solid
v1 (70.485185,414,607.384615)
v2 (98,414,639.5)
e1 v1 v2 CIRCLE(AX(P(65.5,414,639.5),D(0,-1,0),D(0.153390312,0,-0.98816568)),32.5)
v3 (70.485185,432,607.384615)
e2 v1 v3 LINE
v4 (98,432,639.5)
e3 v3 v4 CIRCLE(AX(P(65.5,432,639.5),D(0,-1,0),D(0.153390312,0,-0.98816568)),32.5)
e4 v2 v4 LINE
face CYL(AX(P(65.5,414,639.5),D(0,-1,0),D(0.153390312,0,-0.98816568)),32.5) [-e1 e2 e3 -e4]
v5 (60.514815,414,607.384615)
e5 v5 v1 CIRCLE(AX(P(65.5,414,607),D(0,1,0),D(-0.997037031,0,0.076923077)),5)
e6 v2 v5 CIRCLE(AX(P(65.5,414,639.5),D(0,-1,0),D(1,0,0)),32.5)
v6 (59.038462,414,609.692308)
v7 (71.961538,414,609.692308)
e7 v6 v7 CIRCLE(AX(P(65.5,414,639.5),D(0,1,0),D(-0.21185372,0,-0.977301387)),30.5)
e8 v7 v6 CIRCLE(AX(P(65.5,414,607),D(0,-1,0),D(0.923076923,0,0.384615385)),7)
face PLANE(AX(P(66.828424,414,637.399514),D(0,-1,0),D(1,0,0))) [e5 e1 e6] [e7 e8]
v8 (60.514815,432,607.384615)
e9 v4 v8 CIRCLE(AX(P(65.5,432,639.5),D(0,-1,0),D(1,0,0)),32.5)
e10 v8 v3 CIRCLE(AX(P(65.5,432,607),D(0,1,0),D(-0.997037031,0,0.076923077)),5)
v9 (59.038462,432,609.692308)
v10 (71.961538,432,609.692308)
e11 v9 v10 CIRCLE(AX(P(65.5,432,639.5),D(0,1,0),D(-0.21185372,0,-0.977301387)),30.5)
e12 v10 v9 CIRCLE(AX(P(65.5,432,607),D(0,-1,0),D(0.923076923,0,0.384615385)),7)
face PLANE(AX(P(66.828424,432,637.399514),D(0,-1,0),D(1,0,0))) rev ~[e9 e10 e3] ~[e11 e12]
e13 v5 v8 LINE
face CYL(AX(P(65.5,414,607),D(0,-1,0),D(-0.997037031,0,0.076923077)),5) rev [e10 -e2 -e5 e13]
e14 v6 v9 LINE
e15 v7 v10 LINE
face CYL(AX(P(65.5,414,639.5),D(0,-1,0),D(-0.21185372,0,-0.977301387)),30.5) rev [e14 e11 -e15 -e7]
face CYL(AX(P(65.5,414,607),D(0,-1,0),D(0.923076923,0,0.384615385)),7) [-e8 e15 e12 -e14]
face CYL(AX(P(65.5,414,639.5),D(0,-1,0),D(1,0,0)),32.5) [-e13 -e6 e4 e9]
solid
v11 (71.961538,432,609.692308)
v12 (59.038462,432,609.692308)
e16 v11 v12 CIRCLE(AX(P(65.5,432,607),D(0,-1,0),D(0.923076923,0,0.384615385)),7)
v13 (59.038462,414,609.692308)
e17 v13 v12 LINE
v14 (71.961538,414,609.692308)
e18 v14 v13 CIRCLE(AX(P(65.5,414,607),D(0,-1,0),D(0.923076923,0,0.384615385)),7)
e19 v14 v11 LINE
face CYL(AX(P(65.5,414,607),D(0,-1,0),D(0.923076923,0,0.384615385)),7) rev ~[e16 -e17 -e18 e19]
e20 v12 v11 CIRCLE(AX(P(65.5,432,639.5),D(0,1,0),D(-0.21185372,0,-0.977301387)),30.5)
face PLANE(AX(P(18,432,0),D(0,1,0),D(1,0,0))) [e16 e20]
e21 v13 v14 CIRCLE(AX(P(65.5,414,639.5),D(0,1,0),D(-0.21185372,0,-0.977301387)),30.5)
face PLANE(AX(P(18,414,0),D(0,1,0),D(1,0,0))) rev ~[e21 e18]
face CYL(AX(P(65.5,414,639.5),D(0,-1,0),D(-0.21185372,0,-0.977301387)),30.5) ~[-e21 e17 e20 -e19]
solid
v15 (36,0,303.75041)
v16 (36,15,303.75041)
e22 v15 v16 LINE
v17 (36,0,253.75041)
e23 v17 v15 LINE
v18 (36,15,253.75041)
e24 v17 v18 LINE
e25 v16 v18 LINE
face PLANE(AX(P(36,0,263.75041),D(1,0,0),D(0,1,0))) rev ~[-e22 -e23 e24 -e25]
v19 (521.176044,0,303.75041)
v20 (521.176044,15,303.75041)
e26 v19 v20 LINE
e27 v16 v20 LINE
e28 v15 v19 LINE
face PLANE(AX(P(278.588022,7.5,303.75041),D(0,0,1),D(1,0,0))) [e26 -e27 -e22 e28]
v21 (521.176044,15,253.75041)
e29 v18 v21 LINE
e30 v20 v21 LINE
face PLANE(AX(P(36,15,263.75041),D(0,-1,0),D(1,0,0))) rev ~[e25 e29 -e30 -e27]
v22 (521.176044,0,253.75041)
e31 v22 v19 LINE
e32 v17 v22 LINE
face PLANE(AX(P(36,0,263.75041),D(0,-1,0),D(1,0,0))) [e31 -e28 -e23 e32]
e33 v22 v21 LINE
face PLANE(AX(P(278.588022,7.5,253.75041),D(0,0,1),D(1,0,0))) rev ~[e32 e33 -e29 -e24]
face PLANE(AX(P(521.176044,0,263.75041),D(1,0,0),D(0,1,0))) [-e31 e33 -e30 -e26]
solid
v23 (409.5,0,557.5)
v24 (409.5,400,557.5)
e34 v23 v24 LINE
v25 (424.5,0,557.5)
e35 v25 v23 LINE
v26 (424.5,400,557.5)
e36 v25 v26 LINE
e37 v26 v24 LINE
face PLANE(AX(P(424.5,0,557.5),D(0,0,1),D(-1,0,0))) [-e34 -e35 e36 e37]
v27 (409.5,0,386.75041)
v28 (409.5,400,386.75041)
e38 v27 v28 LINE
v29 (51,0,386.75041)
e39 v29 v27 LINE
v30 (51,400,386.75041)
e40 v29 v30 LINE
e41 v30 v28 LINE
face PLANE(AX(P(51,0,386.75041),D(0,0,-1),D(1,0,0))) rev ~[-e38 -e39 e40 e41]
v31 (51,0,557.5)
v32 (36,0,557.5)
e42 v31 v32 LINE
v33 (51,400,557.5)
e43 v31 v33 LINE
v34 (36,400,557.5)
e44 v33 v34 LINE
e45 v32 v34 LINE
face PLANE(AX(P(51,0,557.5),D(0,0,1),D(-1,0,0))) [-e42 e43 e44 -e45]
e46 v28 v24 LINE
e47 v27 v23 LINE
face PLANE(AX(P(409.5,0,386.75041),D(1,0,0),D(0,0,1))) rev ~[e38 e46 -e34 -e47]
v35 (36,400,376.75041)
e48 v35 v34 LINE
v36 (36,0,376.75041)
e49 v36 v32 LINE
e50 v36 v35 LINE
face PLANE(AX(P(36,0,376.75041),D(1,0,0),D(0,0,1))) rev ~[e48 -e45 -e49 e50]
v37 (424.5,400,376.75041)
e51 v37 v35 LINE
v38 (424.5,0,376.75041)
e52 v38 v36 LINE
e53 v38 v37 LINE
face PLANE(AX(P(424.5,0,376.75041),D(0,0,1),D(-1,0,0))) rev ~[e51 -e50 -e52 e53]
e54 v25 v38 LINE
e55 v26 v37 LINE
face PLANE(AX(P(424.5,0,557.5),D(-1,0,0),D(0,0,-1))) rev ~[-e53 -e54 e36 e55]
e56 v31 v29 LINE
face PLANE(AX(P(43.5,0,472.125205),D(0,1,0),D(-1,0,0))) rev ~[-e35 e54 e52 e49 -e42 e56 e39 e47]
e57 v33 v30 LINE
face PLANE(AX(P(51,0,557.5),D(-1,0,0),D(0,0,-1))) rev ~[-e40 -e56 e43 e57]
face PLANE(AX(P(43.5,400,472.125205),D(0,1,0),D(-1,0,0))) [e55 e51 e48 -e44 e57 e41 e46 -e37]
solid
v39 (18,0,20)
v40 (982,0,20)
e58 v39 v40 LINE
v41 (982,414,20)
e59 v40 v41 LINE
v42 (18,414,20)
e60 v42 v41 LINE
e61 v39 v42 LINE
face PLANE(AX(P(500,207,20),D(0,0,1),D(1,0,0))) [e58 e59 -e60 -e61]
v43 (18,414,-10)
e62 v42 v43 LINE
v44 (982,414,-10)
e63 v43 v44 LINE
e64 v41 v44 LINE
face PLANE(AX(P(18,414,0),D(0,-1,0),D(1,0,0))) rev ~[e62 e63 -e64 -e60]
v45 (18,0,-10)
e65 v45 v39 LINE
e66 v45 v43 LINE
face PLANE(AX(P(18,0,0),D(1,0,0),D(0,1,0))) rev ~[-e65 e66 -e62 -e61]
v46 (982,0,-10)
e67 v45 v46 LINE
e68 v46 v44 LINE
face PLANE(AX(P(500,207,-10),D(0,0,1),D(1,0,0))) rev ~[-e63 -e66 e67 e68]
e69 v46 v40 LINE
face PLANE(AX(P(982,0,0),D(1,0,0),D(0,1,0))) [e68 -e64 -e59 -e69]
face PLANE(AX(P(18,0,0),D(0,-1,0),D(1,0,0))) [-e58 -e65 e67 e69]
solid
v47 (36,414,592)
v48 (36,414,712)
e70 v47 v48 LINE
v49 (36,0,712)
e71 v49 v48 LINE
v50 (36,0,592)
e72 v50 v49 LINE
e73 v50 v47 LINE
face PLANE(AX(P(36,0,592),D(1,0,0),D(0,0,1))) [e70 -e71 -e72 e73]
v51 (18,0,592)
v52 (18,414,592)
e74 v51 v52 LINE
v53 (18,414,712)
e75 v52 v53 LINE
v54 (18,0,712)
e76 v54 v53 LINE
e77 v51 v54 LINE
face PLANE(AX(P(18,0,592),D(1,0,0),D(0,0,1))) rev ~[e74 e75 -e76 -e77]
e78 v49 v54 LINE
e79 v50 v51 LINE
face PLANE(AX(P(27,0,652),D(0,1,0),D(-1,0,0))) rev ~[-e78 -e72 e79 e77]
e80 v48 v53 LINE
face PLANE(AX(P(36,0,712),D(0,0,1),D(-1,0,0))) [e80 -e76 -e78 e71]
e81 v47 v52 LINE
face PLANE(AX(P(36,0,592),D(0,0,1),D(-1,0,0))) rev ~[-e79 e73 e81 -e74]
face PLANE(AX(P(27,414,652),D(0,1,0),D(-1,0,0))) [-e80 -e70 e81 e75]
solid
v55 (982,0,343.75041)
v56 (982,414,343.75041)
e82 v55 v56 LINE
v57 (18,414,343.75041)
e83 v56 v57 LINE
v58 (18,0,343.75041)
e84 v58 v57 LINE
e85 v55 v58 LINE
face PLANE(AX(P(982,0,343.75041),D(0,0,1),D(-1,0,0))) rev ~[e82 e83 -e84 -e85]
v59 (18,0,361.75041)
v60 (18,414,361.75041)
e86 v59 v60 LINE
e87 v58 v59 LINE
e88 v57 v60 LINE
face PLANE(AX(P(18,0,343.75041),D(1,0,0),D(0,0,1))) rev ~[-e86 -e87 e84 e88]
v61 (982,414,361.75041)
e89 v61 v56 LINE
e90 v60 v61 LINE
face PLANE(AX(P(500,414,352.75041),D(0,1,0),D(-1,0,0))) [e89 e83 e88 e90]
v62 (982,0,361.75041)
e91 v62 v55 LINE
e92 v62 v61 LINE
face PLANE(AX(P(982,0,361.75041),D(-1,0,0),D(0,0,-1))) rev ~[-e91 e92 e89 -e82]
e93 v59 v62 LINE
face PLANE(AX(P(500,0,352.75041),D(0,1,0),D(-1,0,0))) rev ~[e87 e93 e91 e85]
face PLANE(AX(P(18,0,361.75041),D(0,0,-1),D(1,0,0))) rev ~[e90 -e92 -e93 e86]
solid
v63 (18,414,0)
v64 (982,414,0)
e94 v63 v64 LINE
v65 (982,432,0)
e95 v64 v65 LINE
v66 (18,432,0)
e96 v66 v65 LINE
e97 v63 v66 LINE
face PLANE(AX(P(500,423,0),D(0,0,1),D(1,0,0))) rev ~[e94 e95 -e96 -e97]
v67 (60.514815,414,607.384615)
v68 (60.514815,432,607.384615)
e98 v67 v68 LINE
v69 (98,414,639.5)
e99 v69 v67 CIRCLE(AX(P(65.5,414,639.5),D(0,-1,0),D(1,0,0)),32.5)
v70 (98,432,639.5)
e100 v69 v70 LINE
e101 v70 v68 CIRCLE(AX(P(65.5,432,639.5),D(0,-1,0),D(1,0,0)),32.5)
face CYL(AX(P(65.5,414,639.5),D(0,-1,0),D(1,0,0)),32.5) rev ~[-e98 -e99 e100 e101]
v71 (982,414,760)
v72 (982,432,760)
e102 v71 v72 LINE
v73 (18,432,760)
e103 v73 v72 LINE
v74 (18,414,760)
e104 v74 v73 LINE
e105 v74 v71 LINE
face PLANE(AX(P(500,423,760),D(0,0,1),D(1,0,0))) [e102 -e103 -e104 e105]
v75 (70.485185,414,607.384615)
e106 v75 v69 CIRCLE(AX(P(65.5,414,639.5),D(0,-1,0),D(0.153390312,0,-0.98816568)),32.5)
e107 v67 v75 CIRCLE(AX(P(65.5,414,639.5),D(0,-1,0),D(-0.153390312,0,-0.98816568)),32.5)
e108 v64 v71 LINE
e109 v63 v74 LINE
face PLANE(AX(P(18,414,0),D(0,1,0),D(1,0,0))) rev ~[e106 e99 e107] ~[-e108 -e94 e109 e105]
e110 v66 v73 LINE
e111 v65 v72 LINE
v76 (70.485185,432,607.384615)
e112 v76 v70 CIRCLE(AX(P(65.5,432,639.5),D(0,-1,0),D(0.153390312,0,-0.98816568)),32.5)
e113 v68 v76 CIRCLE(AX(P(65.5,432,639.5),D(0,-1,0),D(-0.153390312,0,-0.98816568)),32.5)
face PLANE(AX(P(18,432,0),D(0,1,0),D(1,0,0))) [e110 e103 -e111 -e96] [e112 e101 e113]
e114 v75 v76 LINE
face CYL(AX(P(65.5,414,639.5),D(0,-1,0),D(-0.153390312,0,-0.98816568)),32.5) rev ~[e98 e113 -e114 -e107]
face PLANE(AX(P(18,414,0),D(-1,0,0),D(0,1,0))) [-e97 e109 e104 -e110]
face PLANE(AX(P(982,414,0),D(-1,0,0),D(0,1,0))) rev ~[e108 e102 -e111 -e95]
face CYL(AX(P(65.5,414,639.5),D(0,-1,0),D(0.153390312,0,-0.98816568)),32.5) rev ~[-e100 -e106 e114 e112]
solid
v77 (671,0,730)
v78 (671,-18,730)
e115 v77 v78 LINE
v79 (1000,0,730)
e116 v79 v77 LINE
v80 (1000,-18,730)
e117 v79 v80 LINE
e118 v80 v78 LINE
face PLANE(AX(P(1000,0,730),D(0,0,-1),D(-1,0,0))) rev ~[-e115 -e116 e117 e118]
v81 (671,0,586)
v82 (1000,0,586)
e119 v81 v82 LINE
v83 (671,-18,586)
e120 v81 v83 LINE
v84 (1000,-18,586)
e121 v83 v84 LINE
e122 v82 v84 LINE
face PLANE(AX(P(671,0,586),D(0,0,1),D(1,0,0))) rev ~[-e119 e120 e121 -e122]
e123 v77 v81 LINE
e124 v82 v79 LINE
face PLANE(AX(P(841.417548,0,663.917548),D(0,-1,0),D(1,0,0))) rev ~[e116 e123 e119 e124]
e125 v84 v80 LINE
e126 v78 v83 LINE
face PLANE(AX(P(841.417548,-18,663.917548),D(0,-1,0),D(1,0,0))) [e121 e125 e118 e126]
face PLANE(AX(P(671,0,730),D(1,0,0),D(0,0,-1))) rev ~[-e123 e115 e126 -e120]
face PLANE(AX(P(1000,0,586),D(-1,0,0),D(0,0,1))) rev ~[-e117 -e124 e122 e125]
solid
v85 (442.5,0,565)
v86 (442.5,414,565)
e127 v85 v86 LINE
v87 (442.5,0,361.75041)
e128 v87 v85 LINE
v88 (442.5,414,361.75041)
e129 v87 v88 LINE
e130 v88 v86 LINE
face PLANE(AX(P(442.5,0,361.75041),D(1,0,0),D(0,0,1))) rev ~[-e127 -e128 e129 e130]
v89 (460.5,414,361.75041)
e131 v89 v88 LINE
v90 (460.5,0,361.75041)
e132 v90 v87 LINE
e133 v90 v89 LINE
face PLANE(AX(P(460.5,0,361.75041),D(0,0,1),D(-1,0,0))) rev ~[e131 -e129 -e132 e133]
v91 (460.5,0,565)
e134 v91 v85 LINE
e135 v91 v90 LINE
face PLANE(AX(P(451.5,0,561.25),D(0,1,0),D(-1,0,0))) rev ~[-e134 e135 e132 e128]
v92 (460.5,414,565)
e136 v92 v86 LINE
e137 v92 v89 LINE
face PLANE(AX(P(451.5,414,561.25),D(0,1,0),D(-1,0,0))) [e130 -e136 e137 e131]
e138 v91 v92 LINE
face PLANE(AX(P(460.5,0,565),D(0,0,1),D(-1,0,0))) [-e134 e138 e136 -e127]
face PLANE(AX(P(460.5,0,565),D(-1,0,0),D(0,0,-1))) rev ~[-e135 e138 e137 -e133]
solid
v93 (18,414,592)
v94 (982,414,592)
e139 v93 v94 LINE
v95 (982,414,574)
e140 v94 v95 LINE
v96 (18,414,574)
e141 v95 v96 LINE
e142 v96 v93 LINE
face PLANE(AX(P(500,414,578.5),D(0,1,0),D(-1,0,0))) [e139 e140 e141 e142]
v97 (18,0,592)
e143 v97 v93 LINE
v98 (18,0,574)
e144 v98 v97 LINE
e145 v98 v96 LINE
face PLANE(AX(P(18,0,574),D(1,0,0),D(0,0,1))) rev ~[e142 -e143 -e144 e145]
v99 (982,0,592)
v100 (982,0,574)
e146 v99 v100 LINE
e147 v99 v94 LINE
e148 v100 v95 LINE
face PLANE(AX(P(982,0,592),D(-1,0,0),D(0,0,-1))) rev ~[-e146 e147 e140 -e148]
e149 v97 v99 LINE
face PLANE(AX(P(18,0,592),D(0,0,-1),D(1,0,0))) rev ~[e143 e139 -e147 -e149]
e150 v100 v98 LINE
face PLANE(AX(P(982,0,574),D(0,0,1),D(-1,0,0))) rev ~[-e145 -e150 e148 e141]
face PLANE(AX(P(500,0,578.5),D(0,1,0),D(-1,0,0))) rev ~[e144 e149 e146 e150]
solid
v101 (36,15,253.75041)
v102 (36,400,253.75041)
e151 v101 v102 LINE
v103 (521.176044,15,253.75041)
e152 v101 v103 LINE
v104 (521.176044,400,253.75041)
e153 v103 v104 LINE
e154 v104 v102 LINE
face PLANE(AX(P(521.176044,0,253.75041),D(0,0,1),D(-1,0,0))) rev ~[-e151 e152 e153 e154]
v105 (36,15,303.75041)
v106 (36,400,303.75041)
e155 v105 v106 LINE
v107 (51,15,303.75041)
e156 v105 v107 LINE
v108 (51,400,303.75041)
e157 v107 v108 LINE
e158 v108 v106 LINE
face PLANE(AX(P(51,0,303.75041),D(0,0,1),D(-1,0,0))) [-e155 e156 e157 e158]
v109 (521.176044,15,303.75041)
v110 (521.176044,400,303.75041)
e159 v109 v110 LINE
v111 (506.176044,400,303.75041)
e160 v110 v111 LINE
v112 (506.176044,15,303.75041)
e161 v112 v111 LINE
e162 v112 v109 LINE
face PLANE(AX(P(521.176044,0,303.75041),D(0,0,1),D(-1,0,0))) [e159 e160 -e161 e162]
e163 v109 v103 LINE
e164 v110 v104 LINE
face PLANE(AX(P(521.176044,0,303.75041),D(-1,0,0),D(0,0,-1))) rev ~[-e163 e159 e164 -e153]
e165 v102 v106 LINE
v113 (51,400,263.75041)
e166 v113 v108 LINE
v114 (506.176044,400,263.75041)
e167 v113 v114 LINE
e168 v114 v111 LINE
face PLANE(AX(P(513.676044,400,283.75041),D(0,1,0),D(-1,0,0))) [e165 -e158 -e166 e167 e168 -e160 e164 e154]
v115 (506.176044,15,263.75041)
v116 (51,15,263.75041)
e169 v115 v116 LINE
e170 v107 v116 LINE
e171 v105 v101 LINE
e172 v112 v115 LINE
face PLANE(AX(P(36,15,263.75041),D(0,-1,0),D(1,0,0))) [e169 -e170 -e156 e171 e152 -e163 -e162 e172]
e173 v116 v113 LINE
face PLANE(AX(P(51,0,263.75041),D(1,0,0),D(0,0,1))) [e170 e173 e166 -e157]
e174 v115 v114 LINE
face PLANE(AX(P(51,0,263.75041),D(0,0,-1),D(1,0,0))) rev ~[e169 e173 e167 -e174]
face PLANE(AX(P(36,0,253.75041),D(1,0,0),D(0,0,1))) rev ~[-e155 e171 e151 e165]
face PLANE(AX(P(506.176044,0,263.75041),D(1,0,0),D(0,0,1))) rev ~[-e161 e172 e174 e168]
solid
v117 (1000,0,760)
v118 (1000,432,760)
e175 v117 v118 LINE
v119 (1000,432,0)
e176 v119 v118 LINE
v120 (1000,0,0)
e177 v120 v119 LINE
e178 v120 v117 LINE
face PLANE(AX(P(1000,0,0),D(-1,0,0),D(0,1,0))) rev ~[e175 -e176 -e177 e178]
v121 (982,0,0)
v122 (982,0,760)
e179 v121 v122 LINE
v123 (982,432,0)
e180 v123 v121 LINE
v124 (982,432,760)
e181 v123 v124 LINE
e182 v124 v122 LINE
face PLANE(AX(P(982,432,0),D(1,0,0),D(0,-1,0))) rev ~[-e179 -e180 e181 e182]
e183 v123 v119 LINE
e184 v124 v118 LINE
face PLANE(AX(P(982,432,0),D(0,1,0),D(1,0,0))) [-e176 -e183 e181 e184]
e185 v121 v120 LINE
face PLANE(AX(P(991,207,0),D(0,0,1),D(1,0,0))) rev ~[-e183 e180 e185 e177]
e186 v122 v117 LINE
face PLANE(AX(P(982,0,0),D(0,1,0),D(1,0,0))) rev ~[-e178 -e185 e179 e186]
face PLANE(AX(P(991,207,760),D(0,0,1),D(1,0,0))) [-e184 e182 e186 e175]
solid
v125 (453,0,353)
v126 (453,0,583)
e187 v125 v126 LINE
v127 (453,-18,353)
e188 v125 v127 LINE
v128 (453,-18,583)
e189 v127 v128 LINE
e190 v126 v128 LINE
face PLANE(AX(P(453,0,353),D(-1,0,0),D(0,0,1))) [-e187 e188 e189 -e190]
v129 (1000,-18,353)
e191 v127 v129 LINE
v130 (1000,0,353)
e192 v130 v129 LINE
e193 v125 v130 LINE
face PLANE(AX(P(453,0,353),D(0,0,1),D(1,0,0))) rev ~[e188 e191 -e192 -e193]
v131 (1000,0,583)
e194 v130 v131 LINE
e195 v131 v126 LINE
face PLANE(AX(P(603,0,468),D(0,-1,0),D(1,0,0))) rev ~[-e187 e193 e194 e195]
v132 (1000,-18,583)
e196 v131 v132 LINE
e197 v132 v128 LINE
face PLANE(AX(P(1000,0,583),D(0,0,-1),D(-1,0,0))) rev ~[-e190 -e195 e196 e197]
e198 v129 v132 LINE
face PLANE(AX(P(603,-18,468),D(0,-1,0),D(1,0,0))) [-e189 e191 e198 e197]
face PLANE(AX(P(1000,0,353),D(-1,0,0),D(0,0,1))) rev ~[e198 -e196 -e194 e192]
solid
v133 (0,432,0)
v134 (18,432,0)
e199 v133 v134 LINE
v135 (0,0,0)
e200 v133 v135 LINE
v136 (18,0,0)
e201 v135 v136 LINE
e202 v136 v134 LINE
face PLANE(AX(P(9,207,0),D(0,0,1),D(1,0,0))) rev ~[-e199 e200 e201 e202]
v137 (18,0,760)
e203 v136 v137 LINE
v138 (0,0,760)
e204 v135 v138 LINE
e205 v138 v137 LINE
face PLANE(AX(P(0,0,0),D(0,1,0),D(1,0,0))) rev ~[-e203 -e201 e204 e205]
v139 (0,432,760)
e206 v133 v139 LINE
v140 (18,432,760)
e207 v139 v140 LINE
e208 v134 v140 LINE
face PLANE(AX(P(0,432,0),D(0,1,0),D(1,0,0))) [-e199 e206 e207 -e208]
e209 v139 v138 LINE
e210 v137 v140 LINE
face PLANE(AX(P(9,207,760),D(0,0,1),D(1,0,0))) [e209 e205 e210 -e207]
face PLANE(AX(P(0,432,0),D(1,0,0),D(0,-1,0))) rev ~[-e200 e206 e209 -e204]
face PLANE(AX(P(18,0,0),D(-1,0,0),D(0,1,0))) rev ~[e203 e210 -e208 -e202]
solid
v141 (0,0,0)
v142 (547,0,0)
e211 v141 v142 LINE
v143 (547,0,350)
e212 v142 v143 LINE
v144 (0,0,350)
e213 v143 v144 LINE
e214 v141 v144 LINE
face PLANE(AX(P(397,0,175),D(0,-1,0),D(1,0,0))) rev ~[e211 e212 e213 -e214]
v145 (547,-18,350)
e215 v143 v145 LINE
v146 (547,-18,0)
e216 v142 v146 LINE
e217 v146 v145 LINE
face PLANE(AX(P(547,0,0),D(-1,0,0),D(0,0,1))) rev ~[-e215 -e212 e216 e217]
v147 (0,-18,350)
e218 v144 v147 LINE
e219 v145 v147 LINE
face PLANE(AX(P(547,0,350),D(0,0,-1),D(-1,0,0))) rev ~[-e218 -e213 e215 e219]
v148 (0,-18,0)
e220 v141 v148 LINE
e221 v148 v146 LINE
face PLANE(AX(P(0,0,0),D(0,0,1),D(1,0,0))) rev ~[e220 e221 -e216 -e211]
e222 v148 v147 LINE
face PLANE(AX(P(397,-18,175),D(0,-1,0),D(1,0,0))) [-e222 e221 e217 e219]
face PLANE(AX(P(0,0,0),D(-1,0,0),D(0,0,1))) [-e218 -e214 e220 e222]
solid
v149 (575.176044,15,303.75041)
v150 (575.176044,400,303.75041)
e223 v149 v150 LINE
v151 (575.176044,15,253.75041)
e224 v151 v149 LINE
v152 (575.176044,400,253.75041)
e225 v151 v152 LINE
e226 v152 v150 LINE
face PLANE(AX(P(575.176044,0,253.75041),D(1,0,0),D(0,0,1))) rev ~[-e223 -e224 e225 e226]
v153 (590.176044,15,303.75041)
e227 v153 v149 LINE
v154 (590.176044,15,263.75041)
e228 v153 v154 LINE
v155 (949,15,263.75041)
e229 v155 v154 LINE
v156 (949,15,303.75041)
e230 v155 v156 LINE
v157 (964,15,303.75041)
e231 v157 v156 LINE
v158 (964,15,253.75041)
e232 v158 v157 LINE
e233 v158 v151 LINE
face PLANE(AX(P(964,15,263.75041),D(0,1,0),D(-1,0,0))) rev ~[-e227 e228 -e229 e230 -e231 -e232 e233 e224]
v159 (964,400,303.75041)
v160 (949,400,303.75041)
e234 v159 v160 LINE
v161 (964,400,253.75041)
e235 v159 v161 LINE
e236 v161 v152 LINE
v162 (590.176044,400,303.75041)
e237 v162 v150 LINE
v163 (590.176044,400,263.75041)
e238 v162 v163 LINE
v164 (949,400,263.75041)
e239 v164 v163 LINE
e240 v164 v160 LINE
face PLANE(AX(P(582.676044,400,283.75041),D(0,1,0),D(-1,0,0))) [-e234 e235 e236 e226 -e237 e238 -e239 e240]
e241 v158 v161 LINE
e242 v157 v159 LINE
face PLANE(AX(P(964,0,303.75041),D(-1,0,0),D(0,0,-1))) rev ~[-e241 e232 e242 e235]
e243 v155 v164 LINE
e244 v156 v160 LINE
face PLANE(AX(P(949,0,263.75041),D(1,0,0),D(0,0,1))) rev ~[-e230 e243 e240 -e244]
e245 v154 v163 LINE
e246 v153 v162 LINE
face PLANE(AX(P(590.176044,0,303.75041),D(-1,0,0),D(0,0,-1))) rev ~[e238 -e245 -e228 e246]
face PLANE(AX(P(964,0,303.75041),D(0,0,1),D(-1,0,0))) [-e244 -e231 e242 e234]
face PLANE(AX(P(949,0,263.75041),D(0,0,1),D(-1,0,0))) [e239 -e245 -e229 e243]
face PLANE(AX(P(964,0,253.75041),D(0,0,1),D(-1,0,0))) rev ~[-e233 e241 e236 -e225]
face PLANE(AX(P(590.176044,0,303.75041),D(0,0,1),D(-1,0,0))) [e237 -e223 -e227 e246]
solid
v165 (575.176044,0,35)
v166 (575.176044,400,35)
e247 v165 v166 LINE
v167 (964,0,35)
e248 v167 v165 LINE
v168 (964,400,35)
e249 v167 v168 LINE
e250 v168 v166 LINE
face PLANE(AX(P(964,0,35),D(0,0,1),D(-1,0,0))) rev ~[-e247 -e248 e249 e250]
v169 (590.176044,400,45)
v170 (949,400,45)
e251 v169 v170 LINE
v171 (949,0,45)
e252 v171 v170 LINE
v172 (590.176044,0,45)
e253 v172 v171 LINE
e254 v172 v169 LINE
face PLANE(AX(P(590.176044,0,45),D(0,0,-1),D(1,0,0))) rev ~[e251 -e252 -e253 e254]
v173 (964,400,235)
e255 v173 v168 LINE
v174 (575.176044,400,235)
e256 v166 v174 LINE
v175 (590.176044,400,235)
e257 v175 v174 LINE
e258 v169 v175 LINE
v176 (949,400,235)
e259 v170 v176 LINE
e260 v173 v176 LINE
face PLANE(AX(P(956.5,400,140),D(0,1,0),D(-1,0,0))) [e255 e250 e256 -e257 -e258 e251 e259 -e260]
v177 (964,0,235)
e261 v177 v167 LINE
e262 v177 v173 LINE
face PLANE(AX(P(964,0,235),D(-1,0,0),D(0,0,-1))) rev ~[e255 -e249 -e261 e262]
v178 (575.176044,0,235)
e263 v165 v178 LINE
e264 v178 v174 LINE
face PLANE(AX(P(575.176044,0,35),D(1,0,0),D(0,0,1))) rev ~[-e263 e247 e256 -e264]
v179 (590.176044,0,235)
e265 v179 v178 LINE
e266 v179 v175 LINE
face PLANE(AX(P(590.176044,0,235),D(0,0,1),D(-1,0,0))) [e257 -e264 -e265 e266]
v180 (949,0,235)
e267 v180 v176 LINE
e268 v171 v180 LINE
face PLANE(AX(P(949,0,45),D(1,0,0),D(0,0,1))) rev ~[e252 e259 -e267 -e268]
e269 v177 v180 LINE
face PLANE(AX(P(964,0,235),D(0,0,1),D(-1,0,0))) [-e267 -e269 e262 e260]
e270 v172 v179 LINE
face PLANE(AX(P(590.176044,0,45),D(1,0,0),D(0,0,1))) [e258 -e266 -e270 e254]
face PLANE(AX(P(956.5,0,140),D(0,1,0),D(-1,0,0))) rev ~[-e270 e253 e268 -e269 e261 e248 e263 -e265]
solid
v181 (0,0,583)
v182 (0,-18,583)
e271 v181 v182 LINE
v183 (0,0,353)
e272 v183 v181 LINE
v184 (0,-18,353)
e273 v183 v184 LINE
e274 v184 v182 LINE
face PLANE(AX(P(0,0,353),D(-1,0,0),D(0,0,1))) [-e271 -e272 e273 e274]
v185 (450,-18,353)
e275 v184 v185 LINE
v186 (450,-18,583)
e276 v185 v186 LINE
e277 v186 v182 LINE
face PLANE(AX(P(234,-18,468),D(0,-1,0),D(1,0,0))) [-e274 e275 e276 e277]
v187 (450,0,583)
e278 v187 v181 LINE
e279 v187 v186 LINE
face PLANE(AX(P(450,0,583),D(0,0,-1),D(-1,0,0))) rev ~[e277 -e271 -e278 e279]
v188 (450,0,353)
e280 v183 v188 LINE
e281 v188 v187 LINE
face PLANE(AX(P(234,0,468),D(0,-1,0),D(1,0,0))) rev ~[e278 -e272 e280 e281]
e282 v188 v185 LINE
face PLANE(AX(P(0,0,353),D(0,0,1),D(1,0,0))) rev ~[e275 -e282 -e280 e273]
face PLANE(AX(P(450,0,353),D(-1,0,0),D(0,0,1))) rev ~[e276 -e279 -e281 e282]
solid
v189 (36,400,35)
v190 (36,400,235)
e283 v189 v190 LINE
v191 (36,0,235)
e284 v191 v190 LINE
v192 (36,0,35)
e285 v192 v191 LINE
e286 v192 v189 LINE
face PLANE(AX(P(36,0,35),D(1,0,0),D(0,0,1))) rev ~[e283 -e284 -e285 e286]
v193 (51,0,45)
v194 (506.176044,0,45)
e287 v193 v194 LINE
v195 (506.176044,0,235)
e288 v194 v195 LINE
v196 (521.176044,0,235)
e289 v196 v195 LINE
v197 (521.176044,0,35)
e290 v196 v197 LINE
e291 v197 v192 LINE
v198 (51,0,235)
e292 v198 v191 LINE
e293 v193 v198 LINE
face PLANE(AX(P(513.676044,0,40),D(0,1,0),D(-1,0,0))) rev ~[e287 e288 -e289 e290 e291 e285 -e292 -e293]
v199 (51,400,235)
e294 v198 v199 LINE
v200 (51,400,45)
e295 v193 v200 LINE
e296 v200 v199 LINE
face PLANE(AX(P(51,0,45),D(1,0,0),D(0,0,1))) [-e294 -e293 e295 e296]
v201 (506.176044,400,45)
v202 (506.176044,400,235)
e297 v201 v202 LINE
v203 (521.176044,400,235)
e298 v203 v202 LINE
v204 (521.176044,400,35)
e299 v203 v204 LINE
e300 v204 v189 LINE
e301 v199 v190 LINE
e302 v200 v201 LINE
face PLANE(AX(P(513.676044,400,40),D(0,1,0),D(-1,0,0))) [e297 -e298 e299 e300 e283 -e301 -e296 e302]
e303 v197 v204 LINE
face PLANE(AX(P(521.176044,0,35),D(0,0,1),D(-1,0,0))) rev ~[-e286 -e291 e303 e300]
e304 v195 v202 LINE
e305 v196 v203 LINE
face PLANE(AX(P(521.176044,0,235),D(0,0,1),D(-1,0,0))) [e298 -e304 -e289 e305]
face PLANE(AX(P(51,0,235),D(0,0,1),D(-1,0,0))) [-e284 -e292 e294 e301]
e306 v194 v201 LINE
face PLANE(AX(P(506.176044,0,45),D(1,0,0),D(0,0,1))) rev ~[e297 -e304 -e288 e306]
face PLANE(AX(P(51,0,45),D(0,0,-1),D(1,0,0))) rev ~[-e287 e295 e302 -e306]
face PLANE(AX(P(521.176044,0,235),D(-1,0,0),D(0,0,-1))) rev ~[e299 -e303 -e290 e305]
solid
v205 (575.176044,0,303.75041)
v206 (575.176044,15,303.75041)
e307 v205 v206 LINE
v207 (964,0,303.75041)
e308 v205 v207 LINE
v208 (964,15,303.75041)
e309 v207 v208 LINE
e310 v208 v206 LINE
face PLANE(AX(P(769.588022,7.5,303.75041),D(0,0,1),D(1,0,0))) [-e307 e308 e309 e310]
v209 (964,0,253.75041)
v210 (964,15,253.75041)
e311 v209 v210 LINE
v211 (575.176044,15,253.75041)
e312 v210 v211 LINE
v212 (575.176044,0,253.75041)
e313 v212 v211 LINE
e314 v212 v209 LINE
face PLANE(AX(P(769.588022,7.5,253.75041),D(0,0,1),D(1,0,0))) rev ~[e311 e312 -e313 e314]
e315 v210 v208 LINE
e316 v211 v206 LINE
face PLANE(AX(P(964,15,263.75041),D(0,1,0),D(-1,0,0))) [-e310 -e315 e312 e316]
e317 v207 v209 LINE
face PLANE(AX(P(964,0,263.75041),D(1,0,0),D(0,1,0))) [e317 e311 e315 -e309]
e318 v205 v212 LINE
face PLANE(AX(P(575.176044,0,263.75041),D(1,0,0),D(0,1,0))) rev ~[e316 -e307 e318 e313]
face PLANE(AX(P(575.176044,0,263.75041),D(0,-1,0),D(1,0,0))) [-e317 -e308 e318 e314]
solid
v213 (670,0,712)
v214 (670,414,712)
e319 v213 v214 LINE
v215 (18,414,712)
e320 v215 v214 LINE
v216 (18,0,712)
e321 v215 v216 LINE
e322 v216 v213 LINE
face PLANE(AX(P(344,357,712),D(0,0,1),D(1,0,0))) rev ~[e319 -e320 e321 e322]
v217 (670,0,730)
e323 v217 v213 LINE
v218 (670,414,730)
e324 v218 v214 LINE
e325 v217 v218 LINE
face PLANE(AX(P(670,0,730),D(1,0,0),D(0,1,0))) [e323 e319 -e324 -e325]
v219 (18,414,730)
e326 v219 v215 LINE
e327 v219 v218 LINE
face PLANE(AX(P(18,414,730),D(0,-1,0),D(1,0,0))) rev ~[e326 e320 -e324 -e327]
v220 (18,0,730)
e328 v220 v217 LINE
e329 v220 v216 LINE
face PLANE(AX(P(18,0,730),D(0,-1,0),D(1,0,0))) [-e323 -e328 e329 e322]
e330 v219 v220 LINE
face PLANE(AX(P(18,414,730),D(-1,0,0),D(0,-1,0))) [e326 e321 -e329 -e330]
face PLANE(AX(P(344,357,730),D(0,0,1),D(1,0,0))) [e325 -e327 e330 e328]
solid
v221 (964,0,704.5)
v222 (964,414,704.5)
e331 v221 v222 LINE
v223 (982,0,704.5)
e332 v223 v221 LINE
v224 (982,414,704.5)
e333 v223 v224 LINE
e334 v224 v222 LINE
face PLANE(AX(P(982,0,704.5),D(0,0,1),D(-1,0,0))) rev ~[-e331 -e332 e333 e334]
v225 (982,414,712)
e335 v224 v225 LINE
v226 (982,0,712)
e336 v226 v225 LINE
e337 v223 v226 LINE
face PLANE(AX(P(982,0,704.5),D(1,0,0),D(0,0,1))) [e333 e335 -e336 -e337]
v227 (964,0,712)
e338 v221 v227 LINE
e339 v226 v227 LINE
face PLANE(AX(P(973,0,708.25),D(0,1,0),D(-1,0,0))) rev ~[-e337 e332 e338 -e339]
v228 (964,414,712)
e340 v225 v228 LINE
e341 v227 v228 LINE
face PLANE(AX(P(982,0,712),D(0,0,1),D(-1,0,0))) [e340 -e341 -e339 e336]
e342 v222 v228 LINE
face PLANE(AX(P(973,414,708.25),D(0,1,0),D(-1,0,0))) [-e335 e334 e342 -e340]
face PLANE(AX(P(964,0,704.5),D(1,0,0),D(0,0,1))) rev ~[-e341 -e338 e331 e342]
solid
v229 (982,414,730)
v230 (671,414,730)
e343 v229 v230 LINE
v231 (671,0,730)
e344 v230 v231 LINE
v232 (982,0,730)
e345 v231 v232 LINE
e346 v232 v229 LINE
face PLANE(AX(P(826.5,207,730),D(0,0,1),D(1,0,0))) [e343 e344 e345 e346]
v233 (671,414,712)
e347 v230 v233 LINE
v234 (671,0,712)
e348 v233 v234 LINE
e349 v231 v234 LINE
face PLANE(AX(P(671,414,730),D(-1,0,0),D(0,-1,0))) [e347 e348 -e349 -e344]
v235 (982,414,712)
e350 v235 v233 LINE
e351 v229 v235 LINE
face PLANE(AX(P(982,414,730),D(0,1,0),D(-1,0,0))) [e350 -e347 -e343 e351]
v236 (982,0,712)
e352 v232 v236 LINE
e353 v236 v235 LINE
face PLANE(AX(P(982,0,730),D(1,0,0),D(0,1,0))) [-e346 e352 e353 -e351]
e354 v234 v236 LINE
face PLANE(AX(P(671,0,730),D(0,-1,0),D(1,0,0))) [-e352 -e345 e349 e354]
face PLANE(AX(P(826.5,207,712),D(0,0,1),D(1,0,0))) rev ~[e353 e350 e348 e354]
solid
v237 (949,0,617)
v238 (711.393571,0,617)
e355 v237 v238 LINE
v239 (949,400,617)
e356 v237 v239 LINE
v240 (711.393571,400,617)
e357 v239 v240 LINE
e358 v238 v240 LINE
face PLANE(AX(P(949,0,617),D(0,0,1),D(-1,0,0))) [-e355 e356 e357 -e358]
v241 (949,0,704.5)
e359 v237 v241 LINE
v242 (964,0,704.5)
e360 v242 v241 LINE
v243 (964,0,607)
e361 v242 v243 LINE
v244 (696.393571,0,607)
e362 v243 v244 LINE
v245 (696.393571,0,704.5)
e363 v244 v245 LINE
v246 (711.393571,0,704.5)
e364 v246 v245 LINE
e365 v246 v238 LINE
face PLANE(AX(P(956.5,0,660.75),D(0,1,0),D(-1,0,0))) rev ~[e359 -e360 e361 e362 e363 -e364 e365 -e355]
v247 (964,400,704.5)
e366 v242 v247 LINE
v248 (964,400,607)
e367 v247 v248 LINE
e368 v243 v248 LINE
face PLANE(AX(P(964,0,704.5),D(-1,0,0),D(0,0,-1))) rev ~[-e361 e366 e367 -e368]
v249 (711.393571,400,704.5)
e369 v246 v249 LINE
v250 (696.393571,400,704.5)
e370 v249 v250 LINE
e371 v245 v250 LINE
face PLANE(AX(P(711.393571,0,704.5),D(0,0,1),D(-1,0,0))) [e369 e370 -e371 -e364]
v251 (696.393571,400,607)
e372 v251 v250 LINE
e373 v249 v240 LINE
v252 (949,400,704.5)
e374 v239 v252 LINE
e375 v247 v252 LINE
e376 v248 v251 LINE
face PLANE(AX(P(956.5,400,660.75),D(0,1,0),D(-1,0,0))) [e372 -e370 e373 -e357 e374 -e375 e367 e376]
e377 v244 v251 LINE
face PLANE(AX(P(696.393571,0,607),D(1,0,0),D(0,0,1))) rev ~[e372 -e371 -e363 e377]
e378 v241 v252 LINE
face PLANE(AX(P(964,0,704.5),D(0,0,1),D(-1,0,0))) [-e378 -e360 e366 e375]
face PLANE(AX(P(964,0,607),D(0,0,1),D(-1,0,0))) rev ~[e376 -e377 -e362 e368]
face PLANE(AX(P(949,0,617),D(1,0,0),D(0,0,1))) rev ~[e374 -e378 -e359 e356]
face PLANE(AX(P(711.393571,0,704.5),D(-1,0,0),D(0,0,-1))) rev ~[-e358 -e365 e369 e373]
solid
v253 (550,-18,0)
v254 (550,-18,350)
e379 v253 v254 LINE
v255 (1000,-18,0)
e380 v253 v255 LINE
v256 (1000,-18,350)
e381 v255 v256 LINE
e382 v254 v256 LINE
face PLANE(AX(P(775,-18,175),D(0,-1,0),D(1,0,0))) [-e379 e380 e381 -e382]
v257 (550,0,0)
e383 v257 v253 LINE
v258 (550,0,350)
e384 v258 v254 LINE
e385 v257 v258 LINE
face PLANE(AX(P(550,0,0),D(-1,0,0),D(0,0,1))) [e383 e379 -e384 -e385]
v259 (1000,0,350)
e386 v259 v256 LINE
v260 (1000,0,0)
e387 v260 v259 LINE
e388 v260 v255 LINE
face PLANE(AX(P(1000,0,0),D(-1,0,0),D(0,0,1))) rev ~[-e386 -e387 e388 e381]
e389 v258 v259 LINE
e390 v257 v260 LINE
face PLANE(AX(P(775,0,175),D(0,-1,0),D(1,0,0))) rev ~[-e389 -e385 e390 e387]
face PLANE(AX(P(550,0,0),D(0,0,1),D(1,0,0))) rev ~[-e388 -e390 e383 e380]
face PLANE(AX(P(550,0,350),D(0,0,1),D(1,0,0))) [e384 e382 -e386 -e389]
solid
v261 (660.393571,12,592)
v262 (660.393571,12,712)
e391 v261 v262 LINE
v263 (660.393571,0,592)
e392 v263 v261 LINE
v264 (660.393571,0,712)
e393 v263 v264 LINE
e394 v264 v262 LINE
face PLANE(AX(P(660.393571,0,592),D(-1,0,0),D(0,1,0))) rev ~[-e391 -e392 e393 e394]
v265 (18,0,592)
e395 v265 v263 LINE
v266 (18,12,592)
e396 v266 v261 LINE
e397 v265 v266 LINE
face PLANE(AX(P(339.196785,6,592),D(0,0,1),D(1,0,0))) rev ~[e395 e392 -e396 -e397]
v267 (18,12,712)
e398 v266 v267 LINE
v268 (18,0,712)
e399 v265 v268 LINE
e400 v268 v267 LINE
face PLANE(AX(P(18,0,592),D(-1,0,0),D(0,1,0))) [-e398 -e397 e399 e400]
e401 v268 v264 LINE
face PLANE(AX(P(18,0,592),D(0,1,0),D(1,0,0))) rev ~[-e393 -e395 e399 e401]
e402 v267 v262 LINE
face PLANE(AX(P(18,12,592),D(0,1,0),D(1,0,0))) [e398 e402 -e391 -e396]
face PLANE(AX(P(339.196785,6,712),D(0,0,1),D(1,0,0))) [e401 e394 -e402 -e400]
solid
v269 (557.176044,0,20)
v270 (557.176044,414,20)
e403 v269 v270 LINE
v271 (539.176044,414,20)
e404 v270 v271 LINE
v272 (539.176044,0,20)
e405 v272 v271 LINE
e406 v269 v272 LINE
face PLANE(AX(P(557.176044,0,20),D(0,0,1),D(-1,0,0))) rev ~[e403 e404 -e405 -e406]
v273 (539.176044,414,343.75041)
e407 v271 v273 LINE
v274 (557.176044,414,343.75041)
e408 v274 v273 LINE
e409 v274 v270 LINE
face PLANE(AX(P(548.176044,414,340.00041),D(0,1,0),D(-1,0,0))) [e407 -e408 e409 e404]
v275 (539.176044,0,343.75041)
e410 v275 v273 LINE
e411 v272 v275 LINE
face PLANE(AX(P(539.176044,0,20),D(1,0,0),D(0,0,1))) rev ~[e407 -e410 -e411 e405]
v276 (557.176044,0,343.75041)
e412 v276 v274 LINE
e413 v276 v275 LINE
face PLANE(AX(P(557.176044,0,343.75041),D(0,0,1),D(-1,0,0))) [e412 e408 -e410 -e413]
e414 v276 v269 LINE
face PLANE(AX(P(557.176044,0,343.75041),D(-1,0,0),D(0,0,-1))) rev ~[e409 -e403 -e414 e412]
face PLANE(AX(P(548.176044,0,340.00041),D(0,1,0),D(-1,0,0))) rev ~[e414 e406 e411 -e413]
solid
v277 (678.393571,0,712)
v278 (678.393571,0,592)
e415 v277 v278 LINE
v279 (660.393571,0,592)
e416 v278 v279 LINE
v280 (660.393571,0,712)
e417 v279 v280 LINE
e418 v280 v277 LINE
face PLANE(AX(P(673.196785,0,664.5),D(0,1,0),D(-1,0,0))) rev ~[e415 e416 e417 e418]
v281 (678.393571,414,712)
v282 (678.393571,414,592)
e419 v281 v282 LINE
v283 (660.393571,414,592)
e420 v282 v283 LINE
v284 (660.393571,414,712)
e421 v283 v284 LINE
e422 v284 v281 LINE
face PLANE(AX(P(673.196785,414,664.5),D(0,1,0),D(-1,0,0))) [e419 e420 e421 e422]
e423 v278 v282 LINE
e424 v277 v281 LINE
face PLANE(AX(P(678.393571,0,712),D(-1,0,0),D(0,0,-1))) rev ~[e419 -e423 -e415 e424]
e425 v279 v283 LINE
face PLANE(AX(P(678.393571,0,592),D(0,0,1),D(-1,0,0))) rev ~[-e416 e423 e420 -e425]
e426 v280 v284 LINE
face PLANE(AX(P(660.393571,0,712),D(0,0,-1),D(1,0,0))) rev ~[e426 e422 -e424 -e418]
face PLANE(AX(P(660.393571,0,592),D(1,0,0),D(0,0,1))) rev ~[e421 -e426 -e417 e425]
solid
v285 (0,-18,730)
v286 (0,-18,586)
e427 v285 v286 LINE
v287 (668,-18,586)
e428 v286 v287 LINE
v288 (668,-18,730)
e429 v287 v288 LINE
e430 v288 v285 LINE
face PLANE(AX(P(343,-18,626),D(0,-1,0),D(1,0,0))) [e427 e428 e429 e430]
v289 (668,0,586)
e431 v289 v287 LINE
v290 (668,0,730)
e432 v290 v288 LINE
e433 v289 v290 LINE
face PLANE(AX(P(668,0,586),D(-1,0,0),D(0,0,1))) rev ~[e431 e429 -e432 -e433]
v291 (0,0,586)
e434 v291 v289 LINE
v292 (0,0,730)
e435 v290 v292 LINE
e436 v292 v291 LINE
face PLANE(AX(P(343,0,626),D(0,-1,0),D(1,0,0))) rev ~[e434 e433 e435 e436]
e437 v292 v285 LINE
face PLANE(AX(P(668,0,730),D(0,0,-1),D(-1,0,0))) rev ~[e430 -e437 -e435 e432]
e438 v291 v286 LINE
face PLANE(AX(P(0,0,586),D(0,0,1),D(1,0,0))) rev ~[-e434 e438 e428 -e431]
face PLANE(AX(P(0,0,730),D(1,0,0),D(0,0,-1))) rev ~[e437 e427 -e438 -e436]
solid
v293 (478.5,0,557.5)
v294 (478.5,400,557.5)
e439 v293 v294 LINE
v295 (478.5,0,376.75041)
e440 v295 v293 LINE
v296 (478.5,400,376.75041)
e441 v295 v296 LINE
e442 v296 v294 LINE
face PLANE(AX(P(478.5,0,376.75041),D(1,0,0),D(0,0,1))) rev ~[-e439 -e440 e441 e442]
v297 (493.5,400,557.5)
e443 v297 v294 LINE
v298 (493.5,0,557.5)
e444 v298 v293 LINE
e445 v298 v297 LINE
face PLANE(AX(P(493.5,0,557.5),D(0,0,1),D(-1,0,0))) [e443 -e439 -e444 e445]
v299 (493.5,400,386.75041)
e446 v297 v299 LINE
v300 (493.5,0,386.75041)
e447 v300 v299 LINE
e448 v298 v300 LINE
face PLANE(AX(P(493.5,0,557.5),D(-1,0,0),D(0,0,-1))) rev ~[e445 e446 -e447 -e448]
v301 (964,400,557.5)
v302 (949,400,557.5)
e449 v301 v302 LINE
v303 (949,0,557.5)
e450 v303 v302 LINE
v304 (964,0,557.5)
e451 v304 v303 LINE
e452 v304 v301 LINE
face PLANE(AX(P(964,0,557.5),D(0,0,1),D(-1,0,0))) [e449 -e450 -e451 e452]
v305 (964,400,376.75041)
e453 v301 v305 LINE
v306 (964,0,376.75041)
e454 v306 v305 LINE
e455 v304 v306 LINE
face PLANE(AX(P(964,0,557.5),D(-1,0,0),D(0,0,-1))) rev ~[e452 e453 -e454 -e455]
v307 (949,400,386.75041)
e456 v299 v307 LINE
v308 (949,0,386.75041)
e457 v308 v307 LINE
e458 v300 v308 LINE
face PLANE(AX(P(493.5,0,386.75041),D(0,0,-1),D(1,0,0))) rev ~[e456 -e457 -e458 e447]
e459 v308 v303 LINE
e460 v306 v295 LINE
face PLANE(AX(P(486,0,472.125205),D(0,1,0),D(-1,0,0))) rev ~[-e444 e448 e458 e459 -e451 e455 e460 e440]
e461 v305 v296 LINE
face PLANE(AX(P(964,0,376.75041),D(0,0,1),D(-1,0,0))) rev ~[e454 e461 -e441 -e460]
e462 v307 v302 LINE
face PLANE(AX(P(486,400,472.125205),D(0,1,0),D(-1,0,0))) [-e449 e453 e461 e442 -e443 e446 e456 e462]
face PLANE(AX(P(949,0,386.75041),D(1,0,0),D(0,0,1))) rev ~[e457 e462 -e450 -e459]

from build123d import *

# Parameters (mm, degrees)
F0_W           = 18
F0_H           = 414
F0_H_2         = 18
F1_DEPTH       = 760
F0_W_2         = 964
F2_DEPTH       = 760
F3_DEPTH       = 20
F3_DEPTH_BACK  = 10
F5_DEPTH       = 18
F4_W           = 652
F4_H           = 114
F4_H_2         = 300
F7_W           = 432
F7_H           = 230
F7_W_2         = 18
F8_DEPTH       = 18
F7_W_3         = 300
F7_W_4         = 244
F7_W_5         = 3
F7_W_6         = 450
F7_H_2         = 350
F7_W_7         = 226
F7_W_8         = 650
F7_H_3         = 80
F7_H_4         = 46
F7_H_5         = 18
F7_W_9         = 311
F10_DEPTH      = 414
F9_W           = 18
F9_H           = 9
F9_W_2         = 624.3935708242
F9_H_2         = 6
F9_H_3         = 3
F9_W_3         = 7.6064291758
F9_W_4         = 237.6064291758
F9_W_5         = 15
F9_W_6         = 10.3935708242
F9_H_4         = 15
F9_H_5         = 10
F11_DEPTH      = 414
F9_H_6         = 7.5
F9_H_7         = 170.74959
F9_H_8         = 291.25041
F9_H_9         = 120
F9_W_7         = 358.5
F12_DEPTH      = 400
F9_W_8         = 455.5
F9_H_10        = 190
F9_W_9         = 358.8239558978
F9_W_10        = 455.1760441022
F9_H_11        = 40
F9_H_12        = 87.5
F13_W          = 358.8239558978
F13_H          = 15
F13_W_2        = 15
F14_DEPTH      = 40
F14_DEPTH_BACK = 10
F13_W_3        = 485.1760441022
F16_W          = 642.3935708242
F16_H          = 12
F17_DEPTH      = 120
F19_DEPTH      = 18
F20_DEPTH      = 18


# Not quite as in the source:
# - a feature names something its author has since deleted; it is built from what else it names


with BuildPart() as f1:
    # F0 (on Top) → F1 (new body)
    with BuildSketch(Plane.XY):
        with Locations((9, 207)):
            Rectangle(F0_W, F0_H)
        with Locations((9, 423)):
            Rectangle(F0_W, F0_H_2)
    extrude(amount=F1_DEPTH)


with BuildPart() as f1b:
    # F0 (on Top) → F1, piece 2 (new body)
    with BuildSketch(Plane.XY):
        with Locations((991, 207)):
            Rectangle(F0_W, F0_H)
        with Locations((991, 423)):
            Rectangle(F0_W, F0_H_2)
    extrude(amount=F1_DEPTH)


with BuildPart() as f2:
    # F0 (on Top) → F2 (new body, through all)
    with BuildSketch(Plane.XY):
        with Locations((500, 423)):
            Rectangle(F0_W_2, F0_H_2)
    extrude(amount=F2_DEPTH)

    # F18 (on face) → F19 (cut, through all)
    with BuildSketch(Plane.XZ.offset(-414)):
        with BuildLine():
            ThreePointArc((60.5148148474, 607.3846153846), (65.5, 612), (70.4851851526, 607.3846153846))
            ThreePointArc((70.4851851526, 607.3846153846), (90.1806454277, 618.3548884782), (98, 639.5))
            ThreePointArc((98, 639.5), (44.3548884782, 664.1806454277), (60.5148148474, 607.3846153846))
        make_face()
        with BuildLine():
            ThreePointArc((59.0384615385, 609.6923076923), (65.5, 670), (71.9615384615, 609.6923076923))
            ThreePointArc((71.9615384615, 609.6923076923), (65.5, 614), (59.0384615385, 609.6923076923))
        make_face(mode=Mode.SUBTRACT)
        with BuildLine():
            ThreePointArc((60.5148148474, 607.3846153846), (65.5, 607), (70.4851851526, 607.3846153846))
            ThreePointArc((70.4851851526, 607.3846153846), (65.5, 612), (60.5148148474, 607.3846153846))
        make_face()
    extrude(amount=-F19_DEPTH, mode=Mode.SUBTRACT)


with BuildPart() as f3:
    # F0 (on Top) → F3 (new body, two sides)
    with BuildSketch(Plane.XY) as f3_sk:
        with Locations((500, 207)):
            Rectangle(F0_W_2, F0_H)
    extrude(amount=F3_DEPTH)
    extrude(f3_sk.sketch, amount=-F3_DEPTH_BACK)


with BuildPart() as f5:
    # F4 (on face) → F5 (new body)
    with BuildSketch(Plane.XY.offset(760)):
        Polygon((671, 0), (982, 0), (982, 414), (671, 414), (671, 300), align=None)
    extrude(amount=-F5_DEPTH)


with BuildPart() as f5b:
    # F4 (on face) → F5, piece 2 (new body)
    with BuildSketch(Plane.XY.offset(760)):
        with Locations((344, 357)):
            Rectangle(F4_W, F4_H)
        with Locations((344, 150)):
            Rectangle(F4_W, F4_H_2)
    extrude(amount=-F5_DEPTH)


with BuildPart() as f5_1:
    # F6: moved
    add(f5.part.moved(Location((0, 0, -30))))


with BuildPart() as f5b_1:
    # F6: moved
    add(f5b.part.moved(Location((0, 0, -30))))


with BuildPart() as f8:
    # F7 (on face) → F8 (new body)
    with BuildSketch(Plane.XZ):
        with Locations((234, 468)):
            Rectangle(F7_W, F7_H)
        with Locations((9, 468)):
            Rectangle(F7_W_2, F7_H)
    extrude(amount=F8_DEPTH)


with BuildPart() as f8b:
    # F7 (on face) → F8, piece 2 (new body)
    with BuildSketch(Plane.XZ):
        with Locations((603, 468)):
            Rectangle(F7_W_3, F7_H)
        with Locations((878, 468)):
            Rectangle(F7_W_4, F7_H)
        with Locations((754.5, 468)):
            Rectangle(F7_W_5, F7_H)
    extrude(amount=F8_DEPTH)


with BuildPart() as f8c:
    # F7 (on face) → F8, piece 3 (new body)
    with BuildSketch(Plane.XZ):
        with Locations((775, 175)):
            Rectangle(F7_W_6, F7_H_2)
    extrude(amount=F8_DEPTH)


with BuildPart() as f8d:
    # F7 (on face) → F8, piece 4 (new body)
    with BuildSketch(Plane.XZ):
        with Locations((397, 175)):
            Rectangle(F7_W_3, F7_H_2)
        with Locations((131, 175)):
            Rectangle(F7_W_7, F7_H_2)
        with Locations((9, 175)):
            Rectangle(F7_W_2, F7_H_2)
        with Locations((245.5, 175)):
            Rectangle(F7_W_5, F7_H_2)
    extrude(amount=F8_DEPTH)


with BuildPart() as f8e:
    # F7 (on face) → F8, piece 5 (new body)
    with BuildSketch(Plane.XZ):
        with Locations((343, 626)):
            Rectangle(F7_W_8, F7_H_3)
        with Locations((9, 626)):
            Rectangle(F7_W_2, F7_H_3)
        with Locations((9, 689)):
            Rectangle(F7_W_2, F7_H_4)
        with Locations((343, 689)):
            Rectangle(F7_W_8, F7_H_4)
        with Locations((343, 721)):
            Rectangle(F7_W_8, F7_H_5)
        with Locations((9, 721)):
            Rectangle(F7_W_2, F7_H_5)
    extrude(amount=F8_DEPTH)


with BuildPart() as f8f:
    # F7 (on face) → F8, piece 6 (new body)
    with BuildSketch(Plane.XZ):
        Polygon((1000, 730), (671, 730), (671, 604), (982, 604), (982, 586), (1000, 586), align=None)
        with Locations((826.5, 595)):
            Rectangle(F7_W_9, F7_H_5)
    extrude(amount=F8_DEPTH)


with BuildPart() as f10:
    # F9 (on face) → F10 (new body, through all)
    with BuildSketch(Plane(origin=(0, 0, 0), x_dir=(-1, 0, 0), z_dir=(0, 1, 0))):
        Polygon((-18, 361.75041), (-36, 361.75041), (-51, 361.75041), (-442.5, 361.75041), (-460.5, 361.75041), (-964, 361.75041), (-982, 361.75041), (-982, 343.75041), (-964, 343.75041), (-949, 343.75041), (-590.1760441022, 343.75041), (-575.1760441022, 343.75041), (-557.1760441022, 343.75041), (-539.1760441022, 343.75041), (-521.1760441022, 343.75041), (-506.1760441022, 343.75041), (-51, 343.75041), (-36, 343.75041), (-18, 343.75041), align=None)
    extrude(amount=F10_DEPTH)


with BuildPart() as f10b:
    # F9 (on face) → F10, piece 2 (new body, through all)
    with BuildSketch(Plane(origin=(0, 0, 0), x_dir=(-1, 0, 0), z_dir=(0, 1, 0))):
        Polygon((-18, 574), (-18, 583), (-36, 583), (-660.3935708242, 583), (-678.3935708242, 583), (-696.3935708242, 583), (-711.3935708242, 583), (-949, 583), (-964, 583), (-982, 583), (-982, 574), (-424.5, 574), (-409.5, 574), align=None)
        with Locations((-687.3935708242, 587.5)):
            Rectangle(F9_W, F9_H)
        Polygon((-678.3935708242, 583), (-660.3935708242, 583), (-660.3935708242, 586), (-668, 586), (-668, 592), (-678.3935708242, 592), align=None)
        with Locations((-973, 587.5)):
            Rectangle(F9_W, F9_H)
        with Locations((-348.1967854121, 589)):
            Rectangle(F9_W_2, F9_H_2)
        with Locations((-27, 589)):
            Rectangle(F9_W, F9_H_2)
        with Locations((-27, 584.5)):
            Rectangle(F9_W, F9_H_3)
        with Locations((-348.1967854121, 584.5)):
            Rectangle(F9_W_2, F9_H_3)
        with Locations((-664.1967854121, 589)):
            Rectangle(F9_W_3, F9_H_2)
        with Locations((-830.1967854121, 587.5)):
            Rectangle(F9_W_4, F9_H)
        with Locations((-956.5, 587.5)):
            Rectangle(F9_W_5, F9_H)
        with Locations((-703.8935708242, 587.5)):
            Rectangle(F9_W_5, F9_H)
    extrude(amount=F10_DEPTH)


with BuildPart() as f11:
    # F9 (on face) → F11 (new body, through all)
    with BuildSketch(Plane(origin=(0, 0, 0), x_dir=(-1, 0, 0), z_dir=(0, 1, 0))):
        Polygon((-668, 617), (-668, 712), (-678.3935708242, 712), (-678.3935708242, 704.5), (-678.3935708242, 617), align=None)
        Polygon((-668, 592), (-660.3935708242, 592), (-660.3935708242, 712), (-668, 712), (-668, 617), (-668, 607), align=None)
        with Locations((-673.1967854121, 599.5)):
            Rectangle(F9_W_6, F9_H_4)
        with Locations((-673.1967854121, 612)):
            Rectangle(F9_W_6, F9_H_5)
    extrude(amount=F11_DEPTH)


with BuildPart() as f11b:
    # F9 (on face) → F11, piece 2 (new body, through all)
    with BuildSketch(Plane(origin=(0, 0, 0), x_dir=(-1, 0, 0), z_dir=(0, 1, 0))):
        with Locations((-451.5, 561.25)):
            Rectangle(F9_W, F9_H_6)
        with Locations((-451.5, 472.125205)):
            Rectangle(F9_W, F9_H_7)
        with Locations((-451.5, 381.75041)):
            Rectangle(F9_W, F9_H_5)
        with Locations((-451.5, 369.25041)):
            Rectangle(F9_W, F9_H_4)
    extrude(amount=F11_DEPTH)


with BuildPart() as f11c:
    # F9 (on face) → F11, piece 3 (new body, through all)
    with BuildSketch(Plane(origin=(0, 0, 0), x_dir=(-1, 0, 0), z_dir=(0, 1, 0))):
        with Locations((-548.1760441022, 340.00041)):
            Rectangle(F9_W, F9_H_6)
        with Locations((-548.1760441022, 190.625205)):
            Rectangle(F9_W, F9_H_8)
        with Locations((-548.1760441022, 40)):
            Rectangle(F9_W, F9_H_5)
        with Locations((-548.1760441022, 27.5)):
            Rectangle(F9_W, F9_H_4)
    extrude(amount=F11_DEPTH)


with BuildPart() as f11d:
    # F9 (on face) → F11, piece 4 (new body, through all)
    with BuildSketch(Plane(origin=(0, 0, 0), x_dir=(-1, 0, 0), z_dir=(0, 1, 0))):
        with Locations((-973, 708.25)):
            Rectangle(F9_W, F9_H_6)
    extrude(amount=F11_DEPTH)


with BuildPart() as f11e:
    # F9 (on face) → F11, piece 5 (new body, through all)
    with BuildSketch(Plane(origin=(0, 0, 0), x_dir=(-1, 0, 0), z_dir=(0, 1, 0))):
        with Locations((-27, 652)):
            Rectangle(F9_W, F9_H_9)
    extrude(amount=F11_DEPTH)


with BuildPart() as f12:
    # F9 (on face) → F12 (new body)
    with BuildSketch(Plane(origin=(0, 0, 0), x_dir=(-1, 0, 0), z_dir=(0, 1, 0))):
        with Locations((-43.5, 472.125205)):
            Rectangle(F9_W_5, F9_H_7)
        with Locations((-43.5, 381.75041)):
            Rectangle(F9_W_5, F9_H_5)
        with Locations((-230.25, 381.75041)):
            Rectangle(F9_W_7, F9_H_5)
        with Locations((-417, 381.75041)):
            Rectangle(F9_W_5, F9_H_5)
        with Locations((-417, 472.125205)):
            Rectangle(F9_W_5, F9_H_7)
    extrude(amount=F12_DEPTH)


with BuildPart() as f12b:
    # F9 (on face) → F12, piece 2 (new body)
    with BuildSketch(Plane(origin=(0, 0, 0), x_dir=(-1, 0, 0), z_dir=(0, 1, 0))):
        with Locations((-486, 472.125205)):
            Rectangle(F9_W_5, F9_H_7)
        with Locations((-486, 381.75041)):
            Rectangle(F9_W_5, F9_H_5)
        with Locations((-721.25, 381.75041)):
            Rectangle(F9_W_8, F9_H_5)
        with Locations((-956.5, 381.75041)):
            Rectangle(F9_W_5, F9_H_5)
        with Locations((-956.5, 472.125205)):
            Rectangle(F9_W_5, F9_H_7)
    extrude(amount=F12_DEPTH)


with BuildPart() as f12c:
    # F9 (on face) → F12, piece 3 (new body)
    with BuildSketch(Plane(origin=(0, 0, 0), x_dir=(-1, 0, 0), z_dir=(0, 1, 0))):
        with Locations((-956.5, 140)):
            Rectangle(F9_W_5, F9_H_10)
        with Locations((-956.5, 40)):
            Rectangle(F9_W_5, F9_H_5)
        with Locations((-769.5880220511, 40)):
            Rectangle(F9_W_9, F9_H_5)
        with Locations((-582.6760441022, 40)):
            Rectangle(F9_W_5, F9_H_5)
        with Locations((-582.6760441022, 140)):
            Rectangle(F9_W_5, F9_H_10)
    extrude(amount=F12_DEPTH)


with BuildPart() as f12d:
    # F9 (on face) → F12, piece 4 (new body)
    with BuildSketch(Plane(origin=(0, 0, 0), x_dir=(-1, 0, 0), z_dir=(0, 1, 0))):
        with Locations((-513.6760441022, 40)):
            Rectangle(F9_W_5, F9_H_5)
        with Locations((-513.6760441022, 140)):
            Rectangle(F9_W_5, F9_H_10)
        with Locations((-278.5880220511, 40)):
            Rectangle(F9_W_10, F9_H_5)
        with Locations((-43.5, 40)):
            Rectangle(F9_W_5, F9_H_5)
        with Locations((-43.5, 140)):
            Rectangle(F9_W_5, F9_H_10)
    extrude(amount=F12_DEPTH)


with BuildPart() as f12e:
    # F9 (on face) → F12, piece 5 (new body)
    with BuildSketch(Plane(origin=(0, 0, 0), x_dir=(-1, 0, 0), z_dir=(0, 1, 0))):
        with Locations((-513.6760441022, 283.75041)):
            Rectangle(F9_W_5, F9_H_11)
        with Locations((-513.6760441022, 258.75041)):
            Rectangle(F9_W_5, F9_H_5)
        with Locations((-278.5880220511, 258.75041)):
            Rectangle(F9_W_10, F9_H_5)
        with Locations((-43.5, 258.75041)):
            Rectangle(F9_W_5, F9_H_5)
        with Locations((-43.5, 283.75041)):
            Rectangle(F9_W_5, F9_H_11)
    extrude(amount=F12_DEPTH)


with BuildPart() as f12f:
    # F9 (on face) → F12, piece 6 (new body)
    with BuildSketch(Plane(origin=(0, 0, 0), x_dir=(-1, 0, 0), z_dir=(0, 1, 0))):
        with Locations((-582.6760441022, 283.75041)):
            Rectangle(F9_W_5, F9_H_11)
        with Locations((-582.6760441022, 258.75041)):
            Rectangle(F9_W_5, F9_H_5)
        with Locations((-769.5880220511, 258.75041)):
            Rectangle(F9_W_9, F9_H_5)
        with Locations((-956.5, 283.75041)):
            Rectangle(F9_W_5, F9_H_11)
        with Locations((-956.5, 258.75041)):
            Rectangle(F9_W_5, F9_H_5)
    extrude(amount=F12_DEPTH)


with BuildPart() as f12g:
    # F9 (on face) → F12, piece 7 (new body)
    with BuildSketch(Plane(origin=(0, 0, 0), x_dir=(-1, 0, 0), z_dir=(0, 1, 0))):
        with Locations((-956.5, 660.75)):
            Rectangle(F9_W_5, F9_H_12)
        with Locations((-703.8935708242, 660.75)):
            Rectangle(F9_W_5, F9_H_12)
        with Locations((-703.8935708242, 612)):
            Rectangle(F9_W_5, F9_H_5)
        with Locations((-830.1967854121, 612)):
            Rectangle(F9_W_4, F9_H_5)
        with Locations((-956.5, 612)):
            Rectangle(F9_W_5, F9_H_5)
    extrude(amount=F12_DEPTH)


with BuildPart() as f14:
    # F13 (on face) → F14 (new body, two sides)
    with BuildSketch(Plane.XY.offset(263.75041)) as f14_sk:
        with Locations((769.5880220511, 7.5)):
            Rectangle(F13_W, F13_H)
        with Locations((956.5, 7.5)):
            Rectangle(F13_W_2, F13_H)
        with Locations((582.6760441022, 7.5)):
            Rectangle(F13_W_2, F13_H)
    extrude(amount=F14_DEPTH)
    extrude(f14_sk.sketch, amount=-F14_DEPTH_BACK)


with BuildPart() as f14b:
    # F13 (on face) → F14, piece 2 (new body, two sides)
    with BuildSketch(Plane.XY.offset(263.75041)) as f14_2_sk:
        with Locations((278.5880220511, 7.5)):
            Rectangle(F13_W_3, F13_H)
    extrude(amount=F14_DEPTH)
    extrude(f14_2_sk.sketch, amount=-F14_DEPTH_BACK)


with BuildPart() as f12f_1:
    add(f12f.part)

    # F15: cut F14, F14b
    add(f14.part, mode=Mode.SUBTRACT)
    add(f14b.part, mode=Mode.SUBTRACT)


with BuildPart() as f12e_1:
    add(f12e.part)

    # F15: cut F14, F14b
    add(f14.part, mode=Mode.SUBTRACT)
    add(f14b.part, mode=Mode.SUBTRACT)


with BuildPart() as f17:
    # F16 (on face) → F17 (new body, through all)
    with BuildSketch(Plane.XY.offset(592)):
        with Locations((339.1967854121, 6)):
            Rectangle(F16_W, F16_H)
    extrude(amount=F17_DEPTH)


with BuildPart() as f20:
    # F18 (on face) → F20 (new body, through all)
    with BuildSketch(Plane.XZ.offset(-414)):
        with BuildLine():
            ThreePointArc((60.5148148474, 607.3846153846), (65.5, 612), (70.4851851526, 607.3846153846))
            ThreePointArc((70.4851851526, 607.3846153846), (90.1806454277, 618.3548884782), (98, 639.5))
            ThreePointArc((98, 639.5), (44.3548884782, 664.1806454277), (60.5148148474, 607.3846153846))
        make_face()
        with BuildLine():
            ThreePointArc((59.0384615385, 609.6923076923), (65.5, 670), (71.9615384615, 609.6923076923))
            ThreePointArc((71.9615384615, 609.6923076923), (65.5, 614), (59.0384615385, 609.6923076923))
        make_face(mode=Mode.SUBTRACT)
    extrude(amount=-F20_DEPTH)


solid = Compound([f1.part, f1b.part, f2.part, f3.part, f5_1.part, f5b_1.part, f8.part, f8b.part, f8c.part, f8d.part, f8e.part, f8f.part, f10.part, f10b.part, f11.part, f11b.part, f11c.part, f11d.part, f11e.part, f12.part, f12b.part, f12c.part, f12d.part, f12g.part, f14.part, f14b.part, f12f_1.part, f12e_1.part, f17.part, f20.part])
